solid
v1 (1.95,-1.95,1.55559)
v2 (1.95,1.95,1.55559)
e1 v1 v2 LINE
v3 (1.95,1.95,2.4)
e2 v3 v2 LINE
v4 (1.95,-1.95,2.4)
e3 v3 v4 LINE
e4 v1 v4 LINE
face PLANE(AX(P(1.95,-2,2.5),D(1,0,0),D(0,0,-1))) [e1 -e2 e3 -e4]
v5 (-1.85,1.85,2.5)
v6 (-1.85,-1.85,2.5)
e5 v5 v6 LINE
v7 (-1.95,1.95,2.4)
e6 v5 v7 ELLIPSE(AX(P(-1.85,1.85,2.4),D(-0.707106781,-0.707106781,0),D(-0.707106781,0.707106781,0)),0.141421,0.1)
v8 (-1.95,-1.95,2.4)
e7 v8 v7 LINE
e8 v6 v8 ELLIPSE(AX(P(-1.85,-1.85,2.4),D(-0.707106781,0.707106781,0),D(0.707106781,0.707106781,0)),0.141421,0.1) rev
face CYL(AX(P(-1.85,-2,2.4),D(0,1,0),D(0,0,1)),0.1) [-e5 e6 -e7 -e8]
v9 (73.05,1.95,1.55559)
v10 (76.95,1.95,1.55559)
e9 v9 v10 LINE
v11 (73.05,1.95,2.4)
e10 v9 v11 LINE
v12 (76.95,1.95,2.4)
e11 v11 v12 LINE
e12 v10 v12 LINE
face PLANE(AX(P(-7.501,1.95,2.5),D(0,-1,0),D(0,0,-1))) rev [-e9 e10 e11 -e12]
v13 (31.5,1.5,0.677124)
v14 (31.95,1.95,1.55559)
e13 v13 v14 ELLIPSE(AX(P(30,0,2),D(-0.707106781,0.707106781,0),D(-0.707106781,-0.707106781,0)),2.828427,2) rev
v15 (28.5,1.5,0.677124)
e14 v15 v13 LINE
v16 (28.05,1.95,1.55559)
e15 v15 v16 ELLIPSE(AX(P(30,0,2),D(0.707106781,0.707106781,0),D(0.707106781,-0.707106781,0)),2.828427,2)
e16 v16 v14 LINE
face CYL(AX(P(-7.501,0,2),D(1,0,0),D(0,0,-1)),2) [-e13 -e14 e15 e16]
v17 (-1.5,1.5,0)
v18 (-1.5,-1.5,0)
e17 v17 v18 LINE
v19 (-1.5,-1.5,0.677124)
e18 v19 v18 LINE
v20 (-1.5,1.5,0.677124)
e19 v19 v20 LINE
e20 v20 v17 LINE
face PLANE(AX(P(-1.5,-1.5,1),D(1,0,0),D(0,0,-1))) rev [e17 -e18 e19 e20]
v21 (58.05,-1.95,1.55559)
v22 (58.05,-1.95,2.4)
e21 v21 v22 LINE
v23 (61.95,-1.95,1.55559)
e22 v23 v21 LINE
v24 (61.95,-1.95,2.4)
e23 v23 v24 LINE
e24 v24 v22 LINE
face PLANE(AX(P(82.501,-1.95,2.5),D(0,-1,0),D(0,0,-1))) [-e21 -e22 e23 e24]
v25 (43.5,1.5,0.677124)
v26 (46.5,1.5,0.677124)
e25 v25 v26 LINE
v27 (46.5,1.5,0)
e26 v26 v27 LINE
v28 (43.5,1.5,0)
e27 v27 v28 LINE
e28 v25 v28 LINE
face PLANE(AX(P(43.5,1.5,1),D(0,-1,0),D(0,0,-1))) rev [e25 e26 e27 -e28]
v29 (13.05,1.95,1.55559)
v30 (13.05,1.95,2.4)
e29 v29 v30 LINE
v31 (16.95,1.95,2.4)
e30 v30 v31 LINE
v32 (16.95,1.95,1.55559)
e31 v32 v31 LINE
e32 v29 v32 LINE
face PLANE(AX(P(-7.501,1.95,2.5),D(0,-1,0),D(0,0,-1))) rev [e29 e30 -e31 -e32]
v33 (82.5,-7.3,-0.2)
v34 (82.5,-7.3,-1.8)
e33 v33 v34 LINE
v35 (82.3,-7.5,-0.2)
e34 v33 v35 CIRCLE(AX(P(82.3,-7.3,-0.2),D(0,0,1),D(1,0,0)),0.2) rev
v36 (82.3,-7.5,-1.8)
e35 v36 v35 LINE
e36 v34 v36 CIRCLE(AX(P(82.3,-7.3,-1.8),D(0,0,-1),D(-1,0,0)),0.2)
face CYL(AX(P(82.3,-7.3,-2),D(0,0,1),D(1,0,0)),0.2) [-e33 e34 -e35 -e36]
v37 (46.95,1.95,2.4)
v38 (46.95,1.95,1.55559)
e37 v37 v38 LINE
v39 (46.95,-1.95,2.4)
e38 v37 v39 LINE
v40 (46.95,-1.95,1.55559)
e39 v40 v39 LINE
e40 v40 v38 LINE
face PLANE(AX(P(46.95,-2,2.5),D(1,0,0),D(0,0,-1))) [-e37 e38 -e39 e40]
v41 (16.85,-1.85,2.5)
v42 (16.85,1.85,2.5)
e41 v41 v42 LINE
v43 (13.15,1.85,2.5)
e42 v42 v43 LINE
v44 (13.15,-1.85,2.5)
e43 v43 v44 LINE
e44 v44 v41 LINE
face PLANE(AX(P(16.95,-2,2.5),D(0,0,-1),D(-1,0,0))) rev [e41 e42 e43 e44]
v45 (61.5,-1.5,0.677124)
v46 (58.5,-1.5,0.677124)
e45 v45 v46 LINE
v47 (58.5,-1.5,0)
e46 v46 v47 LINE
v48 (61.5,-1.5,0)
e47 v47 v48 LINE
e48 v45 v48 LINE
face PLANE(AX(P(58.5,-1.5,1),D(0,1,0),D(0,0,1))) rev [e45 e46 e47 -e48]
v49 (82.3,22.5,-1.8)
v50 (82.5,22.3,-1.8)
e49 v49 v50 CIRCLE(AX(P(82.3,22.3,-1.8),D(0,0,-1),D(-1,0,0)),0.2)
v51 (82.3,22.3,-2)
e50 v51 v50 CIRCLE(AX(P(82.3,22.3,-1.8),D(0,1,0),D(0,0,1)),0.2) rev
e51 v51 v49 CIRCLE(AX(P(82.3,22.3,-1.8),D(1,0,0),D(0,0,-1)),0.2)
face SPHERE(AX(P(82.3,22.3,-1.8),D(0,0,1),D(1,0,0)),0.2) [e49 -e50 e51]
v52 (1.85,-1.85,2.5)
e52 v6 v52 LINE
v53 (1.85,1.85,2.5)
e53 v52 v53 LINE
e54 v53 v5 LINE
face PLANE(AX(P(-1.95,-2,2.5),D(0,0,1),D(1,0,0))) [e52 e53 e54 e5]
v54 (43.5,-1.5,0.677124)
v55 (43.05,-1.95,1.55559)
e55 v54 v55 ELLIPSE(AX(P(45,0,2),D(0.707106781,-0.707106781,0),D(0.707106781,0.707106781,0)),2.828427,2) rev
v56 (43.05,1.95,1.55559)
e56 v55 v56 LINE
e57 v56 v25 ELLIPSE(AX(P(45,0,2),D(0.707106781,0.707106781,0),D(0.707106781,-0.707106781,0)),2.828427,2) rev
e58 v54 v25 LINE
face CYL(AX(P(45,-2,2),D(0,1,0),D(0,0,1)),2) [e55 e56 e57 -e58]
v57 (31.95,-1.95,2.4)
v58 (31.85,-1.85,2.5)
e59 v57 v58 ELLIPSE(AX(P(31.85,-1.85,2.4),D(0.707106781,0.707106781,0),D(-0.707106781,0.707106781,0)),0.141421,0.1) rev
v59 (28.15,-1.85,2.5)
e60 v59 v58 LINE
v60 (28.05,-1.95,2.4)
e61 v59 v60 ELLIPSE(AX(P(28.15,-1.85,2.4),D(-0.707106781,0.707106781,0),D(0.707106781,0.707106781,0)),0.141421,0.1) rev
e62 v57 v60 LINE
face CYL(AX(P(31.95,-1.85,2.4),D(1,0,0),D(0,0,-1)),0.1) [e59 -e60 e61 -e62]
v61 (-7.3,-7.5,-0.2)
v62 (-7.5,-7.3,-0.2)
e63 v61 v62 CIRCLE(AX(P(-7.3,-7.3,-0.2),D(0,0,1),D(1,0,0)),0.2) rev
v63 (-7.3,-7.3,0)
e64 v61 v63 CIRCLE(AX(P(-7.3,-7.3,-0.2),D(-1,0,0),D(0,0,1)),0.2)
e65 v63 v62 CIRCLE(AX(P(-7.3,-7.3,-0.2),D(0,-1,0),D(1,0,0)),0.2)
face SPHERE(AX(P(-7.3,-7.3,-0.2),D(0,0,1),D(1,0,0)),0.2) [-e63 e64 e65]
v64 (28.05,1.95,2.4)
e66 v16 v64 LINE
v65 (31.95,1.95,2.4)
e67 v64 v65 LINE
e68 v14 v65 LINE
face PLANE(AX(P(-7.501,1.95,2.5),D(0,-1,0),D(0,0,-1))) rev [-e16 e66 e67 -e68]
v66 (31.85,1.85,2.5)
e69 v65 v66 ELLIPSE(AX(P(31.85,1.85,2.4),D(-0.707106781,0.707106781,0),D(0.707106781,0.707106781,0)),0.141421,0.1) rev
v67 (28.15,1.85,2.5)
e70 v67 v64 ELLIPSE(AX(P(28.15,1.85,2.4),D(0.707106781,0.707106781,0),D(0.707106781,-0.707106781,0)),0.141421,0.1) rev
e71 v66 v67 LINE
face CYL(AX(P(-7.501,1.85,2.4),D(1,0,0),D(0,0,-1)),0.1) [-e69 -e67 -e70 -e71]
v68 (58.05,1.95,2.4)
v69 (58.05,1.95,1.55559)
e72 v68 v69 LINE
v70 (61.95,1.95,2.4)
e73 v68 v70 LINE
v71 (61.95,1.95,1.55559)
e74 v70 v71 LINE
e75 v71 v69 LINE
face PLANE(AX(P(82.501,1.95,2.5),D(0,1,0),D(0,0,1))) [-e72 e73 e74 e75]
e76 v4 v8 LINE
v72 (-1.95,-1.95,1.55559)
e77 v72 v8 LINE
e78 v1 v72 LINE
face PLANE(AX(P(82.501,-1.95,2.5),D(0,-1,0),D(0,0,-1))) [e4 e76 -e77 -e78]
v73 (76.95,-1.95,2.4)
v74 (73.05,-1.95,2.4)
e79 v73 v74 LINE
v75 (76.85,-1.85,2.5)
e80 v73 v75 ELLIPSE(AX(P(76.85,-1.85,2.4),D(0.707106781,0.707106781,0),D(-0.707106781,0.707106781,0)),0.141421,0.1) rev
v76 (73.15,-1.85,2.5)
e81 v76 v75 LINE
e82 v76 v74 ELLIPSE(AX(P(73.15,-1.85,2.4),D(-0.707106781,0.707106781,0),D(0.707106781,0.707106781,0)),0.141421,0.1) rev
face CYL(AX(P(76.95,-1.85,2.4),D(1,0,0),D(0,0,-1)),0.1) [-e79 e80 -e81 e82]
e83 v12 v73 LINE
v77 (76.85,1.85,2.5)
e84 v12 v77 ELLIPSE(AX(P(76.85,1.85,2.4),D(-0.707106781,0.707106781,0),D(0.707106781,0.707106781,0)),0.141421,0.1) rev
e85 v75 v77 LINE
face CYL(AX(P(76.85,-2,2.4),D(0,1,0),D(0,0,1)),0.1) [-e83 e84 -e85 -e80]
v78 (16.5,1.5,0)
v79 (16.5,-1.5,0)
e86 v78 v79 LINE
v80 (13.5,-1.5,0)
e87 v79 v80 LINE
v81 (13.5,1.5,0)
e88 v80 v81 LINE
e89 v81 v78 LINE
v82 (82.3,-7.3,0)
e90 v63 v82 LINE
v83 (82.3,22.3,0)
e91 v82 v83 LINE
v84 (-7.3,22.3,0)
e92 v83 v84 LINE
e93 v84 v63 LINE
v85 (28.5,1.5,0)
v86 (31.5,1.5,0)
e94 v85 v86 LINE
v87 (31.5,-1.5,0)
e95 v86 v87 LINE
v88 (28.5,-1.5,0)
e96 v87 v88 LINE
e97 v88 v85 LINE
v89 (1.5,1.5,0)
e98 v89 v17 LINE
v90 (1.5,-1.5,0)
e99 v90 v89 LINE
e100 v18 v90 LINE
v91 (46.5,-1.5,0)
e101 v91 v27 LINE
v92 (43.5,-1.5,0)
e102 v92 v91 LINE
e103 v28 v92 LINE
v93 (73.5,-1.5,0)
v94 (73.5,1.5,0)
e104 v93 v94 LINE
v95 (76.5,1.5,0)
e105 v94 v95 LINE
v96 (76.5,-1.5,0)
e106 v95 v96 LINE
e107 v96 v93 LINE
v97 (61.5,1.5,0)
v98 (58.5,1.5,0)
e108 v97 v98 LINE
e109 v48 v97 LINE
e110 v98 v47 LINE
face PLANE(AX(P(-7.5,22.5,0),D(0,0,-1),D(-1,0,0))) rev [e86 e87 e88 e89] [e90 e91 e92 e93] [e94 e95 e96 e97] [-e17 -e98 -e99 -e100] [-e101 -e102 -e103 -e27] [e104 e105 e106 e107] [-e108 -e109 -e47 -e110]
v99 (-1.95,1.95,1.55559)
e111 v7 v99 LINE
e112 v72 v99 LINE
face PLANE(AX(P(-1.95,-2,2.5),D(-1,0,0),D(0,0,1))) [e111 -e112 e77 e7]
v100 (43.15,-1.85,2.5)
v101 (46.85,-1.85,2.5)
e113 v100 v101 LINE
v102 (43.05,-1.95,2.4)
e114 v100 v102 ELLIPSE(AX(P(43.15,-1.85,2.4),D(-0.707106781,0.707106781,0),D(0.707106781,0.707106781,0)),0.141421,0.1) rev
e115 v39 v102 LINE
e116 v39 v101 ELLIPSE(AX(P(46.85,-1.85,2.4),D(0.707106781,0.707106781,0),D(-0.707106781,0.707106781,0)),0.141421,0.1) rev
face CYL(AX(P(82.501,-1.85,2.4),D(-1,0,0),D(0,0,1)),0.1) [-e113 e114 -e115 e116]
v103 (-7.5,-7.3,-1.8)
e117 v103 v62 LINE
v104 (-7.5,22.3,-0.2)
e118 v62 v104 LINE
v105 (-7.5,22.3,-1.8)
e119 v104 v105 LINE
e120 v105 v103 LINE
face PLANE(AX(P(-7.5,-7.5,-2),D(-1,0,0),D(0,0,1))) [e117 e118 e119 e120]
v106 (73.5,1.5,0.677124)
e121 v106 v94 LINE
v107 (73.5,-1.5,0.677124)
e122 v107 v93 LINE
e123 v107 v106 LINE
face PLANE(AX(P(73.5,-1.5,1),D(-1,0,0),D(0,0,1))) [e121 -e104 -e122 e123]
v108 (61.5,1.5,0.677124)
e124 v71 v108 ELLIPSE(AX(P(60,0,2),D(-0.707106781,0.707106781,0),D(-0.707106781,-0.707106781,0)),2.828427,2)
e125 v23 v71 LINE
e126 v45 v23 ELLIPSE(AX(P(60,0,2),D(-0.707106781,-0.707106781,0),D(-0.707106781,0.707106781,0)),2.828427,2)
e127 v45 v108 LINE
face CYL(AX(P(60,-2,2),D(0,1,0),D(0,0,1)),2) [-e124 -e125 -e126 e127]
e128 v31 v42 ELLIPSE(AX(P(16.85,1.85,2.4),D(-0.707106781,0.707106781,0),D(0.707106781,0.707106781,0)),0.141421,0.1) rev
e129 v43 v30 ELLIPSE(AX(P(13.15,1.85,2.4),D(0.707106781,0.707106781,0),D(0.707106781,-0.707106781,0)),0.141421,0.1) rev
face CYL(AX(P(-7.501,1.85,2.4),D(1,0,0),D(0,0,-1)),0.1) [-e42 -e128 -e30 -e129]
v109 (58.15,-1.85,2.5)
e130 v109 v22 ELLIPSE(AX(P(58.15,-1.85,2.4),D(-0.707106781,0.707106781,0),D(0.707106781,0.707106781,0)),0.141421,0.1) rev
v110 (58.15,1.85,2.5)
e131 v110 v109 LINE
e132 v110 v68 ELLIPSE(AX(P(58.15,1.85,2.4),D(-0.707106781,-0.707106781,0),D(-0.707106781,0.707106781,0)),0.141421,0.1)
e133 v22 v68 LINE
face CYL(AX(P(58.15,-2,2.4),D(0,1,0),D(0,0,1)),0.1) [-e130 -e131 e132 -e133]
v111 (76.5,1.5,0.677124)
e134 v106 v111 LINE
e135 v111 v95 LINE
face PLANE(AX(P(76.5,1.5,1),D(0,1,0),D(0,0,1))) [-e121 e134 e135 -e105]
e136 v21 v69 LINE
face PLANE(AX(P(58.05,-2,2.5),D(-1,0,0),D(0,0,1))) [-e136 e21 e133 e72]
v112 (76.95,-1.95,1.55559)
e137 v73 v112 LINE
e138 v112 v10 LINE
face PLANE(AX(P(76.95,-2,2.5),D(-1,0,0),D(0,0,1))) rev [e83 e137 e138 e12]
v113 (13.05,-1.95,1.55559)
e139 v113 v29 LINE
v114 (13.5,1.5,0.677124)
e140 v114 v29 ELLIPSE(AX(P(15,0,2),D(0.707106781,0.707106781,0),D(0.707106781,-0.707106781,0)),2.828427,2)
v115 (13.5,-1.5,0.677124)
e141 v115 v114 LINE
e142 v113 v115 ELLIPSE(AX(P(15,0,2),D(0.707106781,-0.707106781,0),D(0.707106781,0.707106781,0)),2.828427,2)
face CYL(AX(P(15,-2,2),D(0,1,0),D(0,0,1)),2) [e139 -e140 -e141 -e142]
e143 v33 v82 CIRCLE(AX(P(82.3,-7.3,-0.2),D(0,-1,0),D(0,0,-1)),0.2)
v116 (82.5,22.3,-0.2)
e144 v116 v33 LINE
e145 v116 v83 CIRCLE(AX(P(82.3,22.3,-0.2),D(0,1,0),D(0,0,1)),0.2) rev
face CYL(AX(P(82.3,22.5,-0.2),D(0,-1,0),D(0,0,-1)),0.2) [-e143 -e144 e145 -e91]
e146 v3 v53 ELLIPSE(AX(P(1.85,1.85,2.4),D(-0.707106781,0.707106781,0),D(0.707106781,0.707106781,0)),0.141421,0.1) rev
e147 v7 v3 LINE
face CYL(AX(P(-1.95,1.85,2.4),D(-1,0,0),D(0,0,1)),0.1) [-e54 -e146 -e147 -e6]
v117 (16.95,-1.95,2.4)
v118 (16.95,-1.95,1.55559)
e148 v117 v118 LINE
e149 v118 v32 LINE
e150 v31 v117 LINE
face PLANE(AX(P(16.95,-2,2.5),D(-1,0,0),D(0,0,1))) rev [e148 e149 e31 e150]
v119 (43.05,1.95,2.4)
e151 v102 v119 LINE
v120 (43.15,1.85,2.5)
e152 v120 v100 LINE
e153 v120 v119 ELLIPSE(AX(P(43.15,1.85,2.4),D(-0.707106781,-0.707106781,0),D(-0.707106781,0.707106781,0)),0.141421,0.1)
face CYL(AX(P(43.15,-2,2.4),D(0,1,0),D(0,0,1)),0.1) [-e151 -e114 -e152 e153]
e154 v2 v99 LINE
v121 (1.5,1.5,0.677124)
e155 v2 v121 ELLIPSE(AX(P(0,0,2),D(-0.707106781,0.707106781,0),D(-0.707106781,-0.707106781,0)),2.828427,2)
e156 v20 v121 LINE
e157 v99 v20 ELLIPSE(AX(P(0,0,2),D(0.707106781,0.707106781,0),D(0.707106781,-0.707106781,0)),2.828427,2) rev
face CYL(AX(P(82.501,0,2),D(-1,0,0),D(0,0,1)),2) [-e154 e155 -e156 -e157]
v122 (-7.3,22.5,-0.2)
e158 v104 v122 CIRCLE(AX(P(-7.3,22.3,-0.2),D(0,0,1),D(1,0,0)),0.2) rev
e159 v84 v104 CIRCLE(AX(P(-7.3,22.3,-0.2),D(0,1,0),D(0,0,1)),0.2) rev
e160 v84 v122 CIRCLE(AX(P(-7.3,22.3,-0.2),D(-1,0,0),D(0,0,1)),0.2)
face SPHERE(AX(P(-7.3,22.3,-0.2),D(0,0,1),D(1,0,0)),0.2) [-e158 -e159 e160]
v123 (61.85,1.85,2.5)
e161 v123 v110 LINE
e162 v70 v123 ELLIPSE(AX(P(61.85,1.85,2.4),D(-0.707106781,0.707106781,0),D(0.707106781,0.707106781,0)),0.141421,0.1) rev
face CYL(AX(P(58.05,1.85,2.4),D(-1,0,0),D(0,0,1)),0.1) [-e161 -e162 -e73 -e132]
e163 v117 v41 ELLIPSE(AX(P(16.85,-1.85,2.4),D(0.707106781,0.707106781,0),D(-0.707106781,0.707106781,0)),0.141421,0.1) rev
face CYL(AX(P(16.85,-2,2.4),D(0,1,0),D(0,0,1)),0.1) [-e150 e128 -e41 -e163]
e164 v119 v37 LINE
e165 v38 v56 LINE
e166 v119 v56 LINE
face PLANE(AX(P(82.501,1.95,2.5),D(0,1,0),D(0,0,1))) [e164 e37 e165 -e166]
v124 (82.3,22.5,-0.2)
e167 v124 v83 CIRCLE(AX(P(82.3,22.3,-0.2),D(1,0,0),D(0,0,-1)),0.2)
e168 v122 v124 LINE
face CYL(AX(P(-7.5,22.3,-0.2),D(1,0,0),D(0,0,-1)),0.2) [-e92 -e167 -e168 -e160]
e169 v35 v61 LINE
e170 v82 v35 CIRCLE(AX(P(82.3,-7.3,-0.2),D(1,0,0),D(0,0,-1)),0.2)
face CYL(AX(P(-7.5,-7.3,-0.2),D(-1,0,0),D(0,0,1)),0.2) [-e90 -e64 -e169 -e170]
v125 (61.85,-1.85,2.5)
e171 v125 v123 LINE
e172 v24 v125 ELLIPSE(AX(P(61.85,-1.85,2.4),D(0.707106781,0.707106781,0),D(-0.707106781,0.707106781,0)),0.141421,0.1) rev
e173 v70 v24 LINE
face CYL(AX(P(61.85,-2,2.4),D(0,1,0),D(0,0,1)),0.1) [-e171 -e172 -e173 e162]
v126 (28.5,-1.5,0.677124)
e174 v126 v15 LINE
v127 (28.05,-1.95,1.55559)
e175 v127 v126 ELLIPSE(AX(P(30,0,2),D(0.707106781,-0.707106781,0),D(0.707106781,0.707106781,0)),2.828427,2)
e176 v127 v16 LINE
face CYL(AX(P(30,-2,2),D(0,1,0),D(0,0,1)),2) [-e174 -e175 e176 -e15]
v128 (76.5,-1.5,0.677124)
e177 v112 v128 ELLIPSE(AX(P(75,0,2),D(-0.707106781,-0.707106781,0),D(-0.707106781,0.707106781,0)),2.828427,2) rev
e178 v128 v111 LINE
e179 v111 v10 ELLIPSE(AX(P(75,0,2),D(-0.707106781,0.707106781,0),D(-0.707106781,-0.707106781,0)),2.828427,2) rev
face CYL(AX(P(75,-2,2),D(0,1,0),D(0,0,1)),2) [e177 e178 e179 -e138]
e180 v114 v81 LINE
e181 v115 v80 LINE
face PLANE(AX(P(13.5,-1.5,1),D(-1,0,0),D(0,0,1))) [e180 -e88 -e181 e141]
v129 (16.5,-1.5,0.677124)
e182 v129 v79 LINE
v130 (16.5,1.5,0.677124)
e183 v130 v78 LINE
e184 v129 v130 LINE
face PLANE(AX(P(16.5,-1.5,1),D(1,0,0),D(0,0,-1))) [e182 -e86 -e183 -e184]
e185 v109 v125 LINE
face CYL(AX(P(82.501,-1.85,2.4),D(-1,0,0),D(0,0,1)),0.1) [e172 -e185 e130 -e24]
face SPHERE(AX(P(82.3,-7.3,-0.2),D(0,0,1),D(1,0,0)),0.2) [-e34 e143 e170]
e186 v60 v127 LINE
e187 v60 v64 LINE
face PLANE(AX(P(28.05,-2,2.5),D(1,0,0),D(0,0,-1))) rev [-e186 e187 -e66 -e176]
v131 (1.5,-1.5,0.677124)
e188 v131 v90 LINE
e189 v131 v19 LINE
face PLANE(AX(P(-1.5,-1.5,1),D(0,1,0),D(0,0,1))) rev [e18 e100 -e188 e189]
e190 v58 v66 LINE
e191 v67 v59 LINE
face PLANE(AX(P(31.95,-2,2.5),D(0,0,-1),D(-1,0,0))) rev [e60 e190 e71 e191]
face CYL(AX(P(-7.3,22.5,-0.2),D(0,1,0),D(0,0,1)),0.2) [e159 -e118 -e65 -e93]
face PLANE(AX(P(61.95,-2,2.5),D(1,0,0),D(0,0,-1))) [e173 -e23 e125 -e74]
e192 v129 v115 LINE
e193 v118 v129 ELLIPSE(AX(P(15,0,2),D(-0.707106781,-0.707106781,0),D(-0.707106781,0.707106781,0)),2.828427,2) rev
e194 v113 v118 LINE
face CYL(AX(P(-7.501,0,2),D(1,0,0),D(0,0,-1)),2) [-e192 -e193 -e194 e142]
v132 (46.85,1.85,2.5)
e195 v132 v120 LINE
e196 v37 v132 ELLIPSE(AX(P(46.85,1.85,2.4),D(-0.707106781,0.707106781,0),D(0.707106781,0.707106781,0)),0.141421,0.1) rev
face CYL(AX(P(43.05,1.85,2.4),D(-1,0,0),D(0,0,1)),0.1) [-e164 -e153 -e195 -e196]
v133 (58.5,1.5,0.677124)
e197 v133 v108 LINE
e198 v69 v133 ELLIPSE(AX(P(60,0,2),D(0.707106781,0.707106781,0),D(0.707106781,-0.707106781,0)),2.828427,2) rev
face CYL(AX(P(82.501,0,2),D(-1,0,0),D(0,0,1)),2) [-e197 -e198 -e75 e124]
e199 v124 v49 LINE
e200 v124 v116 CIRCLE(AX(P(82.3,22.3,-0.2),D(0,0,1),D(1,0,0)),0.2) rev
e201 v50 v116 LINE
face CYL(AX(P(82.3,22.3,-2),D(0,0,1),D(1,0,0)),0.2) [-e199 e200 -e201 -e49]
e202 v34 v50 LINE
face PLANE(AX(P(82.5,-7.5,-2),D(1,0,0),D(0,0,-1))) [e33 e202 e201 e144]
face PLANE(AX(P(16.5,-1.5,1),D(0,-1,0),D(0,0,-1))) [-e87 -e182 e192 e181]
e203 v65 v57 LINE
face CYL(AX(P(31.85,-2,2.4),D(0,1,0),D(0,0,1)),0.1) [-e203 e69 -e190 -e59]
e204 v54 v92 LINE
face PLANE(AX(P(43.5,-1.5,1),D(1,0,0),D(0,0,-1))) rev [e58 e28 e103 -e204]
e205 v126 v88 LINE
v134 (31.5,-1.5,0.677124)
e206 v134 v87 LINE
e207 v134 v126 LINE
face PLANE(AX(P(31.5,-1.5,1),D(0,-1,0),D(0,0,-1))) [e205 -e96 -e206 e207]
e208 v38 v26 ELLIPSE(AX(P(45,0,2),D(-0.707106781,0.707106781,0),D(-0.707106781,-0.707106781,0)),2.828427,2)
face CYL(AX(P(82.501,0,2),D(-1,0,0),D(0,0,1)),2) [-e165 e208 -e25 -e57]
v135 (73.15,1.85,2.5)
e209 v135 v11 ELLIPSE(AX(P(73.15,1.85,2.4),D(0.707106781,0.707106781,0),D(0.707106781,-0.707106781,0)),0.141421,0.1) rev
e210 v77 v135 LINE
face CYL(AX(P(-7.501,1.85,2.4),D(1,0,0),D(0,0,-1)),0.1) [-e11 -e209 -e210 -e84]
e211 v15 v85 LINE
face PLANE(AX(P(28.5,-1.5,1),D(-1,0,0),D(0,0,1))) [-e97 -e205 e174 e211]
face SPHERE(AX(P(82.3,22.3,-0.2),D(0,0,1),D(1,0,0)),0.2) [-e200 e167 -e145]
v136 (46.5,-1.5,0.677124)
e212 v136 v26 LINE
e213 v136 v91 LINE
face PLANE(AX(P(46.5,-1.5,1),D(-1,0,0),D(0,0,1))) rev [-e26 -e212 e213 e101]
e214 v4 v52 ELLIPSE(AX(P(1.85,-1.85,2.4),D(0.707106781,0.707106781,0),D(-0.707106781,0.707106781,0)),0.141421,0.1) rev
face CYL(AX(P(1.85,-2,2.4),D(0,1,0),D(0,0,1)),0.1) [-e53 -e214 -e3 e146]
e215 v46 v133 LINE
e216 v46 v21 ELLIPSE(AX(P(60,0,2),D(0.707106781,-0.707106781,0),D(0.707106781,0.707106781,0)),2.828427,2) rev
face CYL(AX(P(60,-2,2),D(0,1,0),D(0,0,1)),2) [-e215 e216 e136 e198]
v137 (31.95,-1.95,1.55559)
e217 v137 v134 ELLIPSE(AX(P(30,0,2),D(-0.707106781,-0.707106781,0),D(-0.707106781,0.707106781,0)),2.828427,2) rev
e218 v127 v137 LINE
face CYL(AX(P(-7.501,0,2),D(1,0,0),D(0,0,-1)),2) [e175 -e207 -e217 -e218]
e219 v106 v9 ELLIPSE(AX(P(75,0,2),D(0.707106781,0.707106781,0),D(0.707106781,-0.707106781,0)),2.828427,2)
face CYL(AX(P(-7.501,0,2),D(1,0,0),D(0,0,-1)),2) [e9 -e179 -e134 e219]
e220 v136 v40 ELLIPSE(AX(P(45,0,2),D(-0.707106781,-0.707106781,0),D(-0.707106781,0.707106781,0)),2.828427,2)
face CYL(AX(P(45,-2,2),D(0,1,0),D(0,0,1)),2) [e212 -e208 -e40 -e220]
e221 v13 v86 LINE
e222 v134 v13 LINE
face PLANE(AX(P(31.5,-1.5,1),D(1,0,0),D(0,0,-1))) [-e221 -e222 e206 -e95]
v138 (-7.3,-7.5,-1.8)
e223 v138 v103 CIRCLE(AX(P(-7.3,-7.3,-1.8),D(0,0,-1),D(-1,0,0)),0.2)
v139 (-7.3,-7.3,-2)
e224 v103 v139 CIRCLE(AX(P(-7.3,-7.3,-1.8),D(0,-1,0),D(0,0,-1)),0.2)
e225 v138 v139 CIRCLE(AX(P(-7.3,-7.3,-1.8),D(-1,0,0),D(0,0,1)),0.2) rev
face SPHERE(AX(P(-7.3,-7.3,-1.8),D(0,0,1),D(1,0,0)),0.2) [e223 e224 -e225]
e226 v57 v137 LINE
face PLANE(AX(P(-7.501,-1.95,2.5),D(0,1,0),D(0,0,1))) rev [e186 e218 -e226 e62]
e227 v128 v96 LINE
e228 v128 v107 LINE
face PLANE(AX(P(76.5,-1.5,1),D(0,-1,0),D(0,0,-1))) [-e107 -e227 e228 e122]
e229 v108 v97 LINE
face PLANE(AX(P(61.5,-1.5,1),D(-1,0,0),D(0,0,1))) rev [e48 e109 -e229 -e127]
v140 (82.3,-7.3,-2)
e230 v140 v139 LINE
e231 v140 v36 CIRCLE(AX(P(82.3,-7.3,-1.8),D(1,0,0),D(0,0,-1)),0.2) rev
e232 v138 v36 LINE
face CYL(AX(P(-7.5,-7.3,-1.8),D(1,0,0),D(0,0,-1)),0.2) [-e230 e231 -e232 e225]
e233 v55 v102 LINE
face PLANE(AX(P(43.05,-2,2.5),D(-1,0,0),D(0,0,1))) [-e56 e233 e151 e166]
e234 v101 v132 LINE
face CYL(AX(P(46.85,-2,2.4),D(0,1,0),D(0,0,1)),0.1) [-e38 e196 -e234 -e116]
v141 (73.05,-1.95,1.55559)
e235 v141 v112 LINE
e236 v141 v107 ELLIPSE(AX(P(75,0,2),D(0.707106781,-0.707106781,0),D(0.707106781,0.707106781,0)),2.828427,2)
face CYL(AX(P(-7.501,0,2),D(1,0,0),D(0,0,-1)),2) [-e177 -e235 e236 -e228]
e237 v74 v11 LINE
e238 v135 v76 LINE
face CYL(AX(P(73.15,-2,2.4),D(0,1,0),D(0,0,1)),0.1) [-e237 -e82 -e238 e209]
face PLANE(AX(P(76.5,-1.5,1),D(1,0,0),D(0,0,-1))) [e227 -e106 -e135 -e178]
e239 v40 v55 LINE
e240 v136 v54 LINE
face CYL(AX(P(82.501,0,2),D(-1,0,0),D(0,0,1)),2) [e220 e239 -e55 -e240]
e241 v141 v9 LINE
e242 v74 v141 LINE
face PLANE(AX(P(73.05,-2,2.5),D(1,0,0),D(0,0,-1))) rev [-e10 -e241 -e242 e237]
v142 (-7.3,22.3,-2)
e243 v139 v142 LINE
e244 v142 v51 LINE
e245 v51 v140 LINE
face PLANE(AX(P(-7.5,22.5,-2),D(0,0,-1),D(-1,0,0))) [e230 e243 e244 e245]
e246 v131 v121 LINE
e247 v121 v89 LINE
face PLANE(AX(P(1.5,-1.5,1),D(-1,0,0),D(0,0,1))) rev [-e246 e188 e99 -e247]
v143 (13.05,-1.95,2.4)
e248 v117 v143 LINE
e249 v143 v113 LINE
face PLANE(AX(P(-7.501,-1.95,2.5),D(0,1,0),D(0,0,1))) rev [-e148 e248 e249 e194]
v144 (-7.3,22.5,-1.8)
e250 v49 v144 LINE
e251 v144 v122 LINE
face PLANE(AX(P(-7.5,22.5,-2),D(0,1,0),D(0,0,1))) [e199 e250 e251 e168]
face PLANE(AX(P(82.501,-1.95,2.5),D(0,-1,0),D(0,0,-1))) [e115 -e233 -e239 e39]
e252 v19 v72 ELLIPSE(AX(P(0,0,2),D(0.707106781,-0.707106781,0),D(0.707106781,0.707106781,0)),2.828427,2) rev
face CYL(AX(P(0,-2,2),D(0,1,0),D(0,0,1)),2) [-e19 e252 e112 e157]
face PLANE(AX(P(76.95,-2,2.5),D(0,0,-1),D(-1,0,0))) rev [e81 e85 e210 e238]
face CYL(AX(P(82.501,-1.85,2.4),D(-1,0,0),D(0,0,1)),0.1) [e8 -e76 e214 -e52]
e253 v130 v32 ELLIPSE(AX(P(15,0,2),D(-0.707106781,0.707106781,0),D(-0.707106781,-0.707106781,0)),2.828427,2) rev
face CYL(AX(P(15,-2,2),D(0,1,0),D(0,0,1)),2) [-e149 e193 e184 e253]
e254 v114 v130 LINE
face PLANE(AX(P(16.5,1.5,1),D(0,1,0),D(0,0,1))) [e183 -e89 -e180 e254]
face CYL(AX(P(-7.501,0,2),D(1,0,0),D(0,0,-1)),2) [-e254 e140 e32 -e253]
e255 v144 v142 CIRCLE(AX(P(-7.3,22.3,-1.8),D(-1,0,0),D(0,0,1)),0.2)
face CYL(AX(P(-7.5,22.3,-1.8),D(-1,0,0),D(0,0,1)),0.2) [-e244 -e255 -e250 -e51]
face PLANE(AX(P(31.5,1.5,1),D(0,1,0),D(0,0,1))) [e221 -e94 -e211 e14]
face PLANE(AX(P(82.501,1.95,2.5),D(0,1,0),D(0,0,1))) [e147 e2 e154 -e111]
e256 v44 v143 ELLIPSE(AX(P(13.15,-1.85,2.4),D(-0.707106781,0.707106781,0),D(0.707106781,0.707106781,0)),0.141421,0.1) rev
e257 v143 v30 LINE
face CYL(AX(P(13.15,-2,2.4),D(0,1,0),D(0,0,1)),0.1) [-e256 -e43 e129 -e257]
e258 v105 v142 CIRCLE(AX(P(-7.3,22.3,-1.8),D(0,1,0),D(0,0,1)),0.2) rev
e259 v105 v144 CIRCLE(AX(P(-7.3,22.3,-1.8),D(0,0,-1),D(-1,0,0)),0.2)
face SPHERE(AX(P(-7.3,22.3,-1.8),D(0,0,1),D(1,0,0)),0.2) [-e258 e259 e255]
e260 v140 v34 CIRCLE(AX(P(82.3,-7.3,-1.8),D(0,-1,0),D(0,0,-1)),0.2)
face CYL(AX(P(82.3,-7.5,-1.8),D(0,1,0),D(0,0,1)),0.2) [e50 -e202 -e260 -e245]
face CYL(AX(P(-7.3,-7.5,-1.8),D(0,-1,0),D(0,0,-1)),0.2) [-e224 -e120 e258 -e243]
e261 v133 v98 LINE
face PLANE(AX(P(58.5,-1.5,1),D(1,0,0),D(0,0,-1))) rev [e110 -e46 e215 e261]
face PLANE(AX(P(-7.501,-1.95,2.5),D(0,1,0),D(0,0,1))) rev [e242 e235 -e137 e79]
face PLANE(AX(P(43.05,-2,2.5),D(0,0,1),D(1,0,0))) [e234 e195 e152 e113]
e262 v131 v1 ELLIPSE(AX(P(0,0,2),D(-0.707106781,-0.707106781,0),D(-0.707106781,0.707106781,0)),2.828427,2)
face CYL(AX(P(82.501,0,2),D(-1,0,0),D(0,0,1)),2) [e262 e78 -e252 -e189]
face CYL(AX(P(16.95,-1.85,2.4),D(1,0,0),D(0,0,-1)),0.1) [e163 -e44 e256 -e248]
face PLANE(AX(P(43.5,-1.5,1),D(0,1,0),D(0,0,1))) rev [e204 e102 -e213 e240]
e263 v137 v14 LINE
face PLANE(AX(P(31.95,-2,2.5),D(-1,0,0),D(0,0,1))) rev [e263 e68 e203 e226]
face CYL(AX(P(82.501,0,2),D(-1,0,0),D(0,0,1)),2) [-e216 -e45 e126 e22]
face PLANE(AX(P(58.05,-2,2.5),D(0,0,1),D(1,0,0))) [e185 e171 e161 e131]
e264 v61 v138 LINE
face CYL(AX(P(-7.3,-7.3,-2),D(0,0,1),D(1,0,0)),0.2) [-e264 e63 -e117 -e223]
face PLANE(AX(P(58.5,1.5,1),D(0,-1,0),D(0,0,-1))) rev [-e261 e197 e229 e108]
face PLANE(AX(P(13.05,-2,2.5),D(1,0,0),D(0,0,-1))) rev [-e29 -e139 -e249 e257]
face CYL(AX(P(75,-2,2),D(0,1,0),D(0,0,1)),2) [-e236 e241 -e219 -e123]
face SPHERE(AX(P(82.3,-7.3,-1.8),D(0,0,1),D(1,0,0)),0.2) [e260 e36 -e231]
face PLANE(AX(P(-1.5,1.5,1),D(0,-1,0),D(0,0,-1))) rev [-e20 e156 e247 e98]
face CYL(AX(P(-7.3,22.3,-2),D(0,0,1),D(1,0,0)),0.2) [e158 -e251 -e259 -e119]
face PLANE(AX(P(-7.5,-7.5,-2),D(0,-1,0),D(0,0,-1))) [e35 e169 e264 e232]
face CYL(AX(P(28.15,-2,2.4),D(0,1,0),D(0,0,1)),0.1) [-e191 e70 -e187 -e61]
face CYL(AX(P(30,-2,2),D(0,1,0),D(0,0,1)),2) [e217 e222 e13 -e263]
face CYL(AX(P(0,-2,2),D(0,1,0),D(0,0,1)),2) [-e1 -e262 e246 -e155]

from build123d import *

# Parameters (mm, degrees)
SKETCH_1_W                      = 90
SKETCH_1_H                      = 30
EXTRUDE_1_DEPTH                 = 2
SKETCH_2_W                      = 3
SKETCH_2_H                      = 3
EXTRUDE_2_DEPTH                 = 1
EXTRUDE_3_DEPTH                 = 2
CUT_EXTRUDE_1_REACH             = 87.55
CUT_EXTRUDE_1_DIRECTION_2_REACH = 87.55
FILLET_1_R                      = 0.1
FILLET_1_OF_MIRROR_1_R          = 0.1
FILLET_1_OF_MIRROR_3_R          = 0.1
FILLET_2_R                      = 0.2


# Read off the part's stored shape, not the designer's step: 镜向4
with BuildPart() as part:
    # 草图1 → 凸台-拉伸1 (new body)
    with BuildSketch(Plane.XY):
        with Locations((37.5, 7.5)):
            Rectangle(SKETCH_1_W, SKETCH_1_H)
    extrude(amount=-EXTRUDE_1_DEPTH)

    # 草图2 → 凸台-拉伸2 (add)
    with BuildSketch(Plane.XY):
        Rectangle(SKETCH_2_W, SKETCH_2_H)
    extrude_2 = extrude(amount=EXTRUDE_2_DEPTH)

    # 草图3 → 凸台-拉伸3 (add, symmetric)
    with BuildSketch(Plane(origin=(0, 0, 0), x_dir=(1, 0, 0), z_dir=(0, 1, 0))):
        with BuildLine():
            Line((-1.95, -2.5), (1.95, -2.5))
            Line((1.95, -2.5), (1.95, -1.555590279))
            ThreePointArc((1.95, -1.555590279), (1.780042303, -1.088161527), (1.5, -0.677124344))
            Line((1.5, -0.677124344), (-1.5, -0.677124344))
            ThreePointArc((-1.5, -0.677124344), (-1.780042303, -1.088161527), (-1.95, -1.555590279))
            Line((-1.95, -1.555590279), (-1.95, -2.5))
        make_face()
    extrude_3 = extrude(amount=EXTRUDE_3_DEPTH, both=True)

    # 草图4 → 切除-拉伸1 (cut, up to next)
    with BuildSketch(Plane(origin=(0, 0, 0), x_dir=(0, 0, -1), z_dir=(1, 0, 0)), mode=Mode.PRIVATE) as cut_extrude_1_sk1:
        with BuildLine():
            Line((-2.5, 1.95), (-1.555590279, 1.95))
            ThreePointArc((-1.555590279, 1.95), (-1.088161527, 1.780042303), (-0.677124344, 1.5))
            Line((-0.677124344, 1.5), (-0.677124344, 2))
            Line((-0.677124344, 2), (-2.5, 2))
            Line((-2.5, 2), (-2.5, 1.95))
        make_face()
    cut_extrude_1_tool1 = extrude(cut_extrude_1_sk1.sketch, amount=-CUT_EXTRUDE_1_REACH, mode=Mode.PRIVATE) & part.part
    # 草图4 → 切除-拉伸1 (cut, up to next)
    with BuildSketch(Plane(origin=(0, 0, 0), x_dir=(0, 0, -1), z_dir=(1, 0, 0)), mode=Mode.PRIVATE) as cut_extrude_1_sk2:
        with BuildLine():
            Line((-2.5, -2), (-0.677124344, -2))
            Line((-0.677124344, -2), (-0.677124344, -1.5))
            ThreePointArc((-0.677124344, -1.5), (-1.088161527, -1.780042303), (-1.555590279, -1.95))
            Line((-1.555590279, -1.95), (-2.5, -1.95))
            Line((-2.5, -1.95), (-2.5, -2))
        make_face()
    cut_extrude_1_tool2 = extrude(cut_extrude_1_sk2.sketch, amount=-CUT_EXTRUDE_1_REACH, mode=Mode.PRIVATE) & part.part
    cut_extrude_1_1 = cut_extrude_1_tool1.solids().sort_by_distance((0, 1.873038, 1.175075))[0]
    add(cut_extrude_1_1, mode=Mode.SUBTRACT)
    cut_extrude_1_2 = cut_extrude_1_tool2.solids().sort_by_distance((0, -1.873038, 1.175075))[0]
    add(cut_extrude_1_2, mode=Mode.SUBTRACT)
    cut_extrude_1 = cut_extrude_1_1 + cut_extrude_1_2  # 切除-拉伸1 as one shape, for the pattern or mirror that repeats it

    # 草图4 → 切除-拉伸1 direction 2 (cut, up to next)
    with BuildSketch(Plane(origin=(0, 0, 0), x_dir=(0, 0, -1), z_dir=(1, 0, 0)), mode=Mode.PRIVATE) as cut_extrude_1_direction_2_sk1:
        with BuildLine():
            Line((-2.5, 1.95), (-1.555590279, 1.95))
            ThreePointArc((-1.555590279, 1.95), (-1.088161527, 1.780042303), (-0.677124344, 1.5))
            Line((-0.677124344, 1.5), (-0.677124344, 2))
            Line((-0.677124344, 2), (-2.5, 2))
            Line((-2.5, 2), (-2.5, 1.95))
        make_face()
    cut_extrude_1_direction_2_tool1 = extrude(cut_extrude_1_direction_2_sk1.sketch, amount=CUT_EXTRUDE_1_DIRECTION_2_REACH, mode=Mode.PRIVATE) & part.part
    # 草图4 → 切除-拉伸1 direction 2 (cut, up to next)
    with BuildSketch(Plane(origin=(0, 0, 0), x_dir=(0, 0, -1), z_dir=(1, 0, 0)), mode=Mode.PRIVATE) as cut_extrude_1_direction_2_sk2:
        with BuildLine():
            Line((-2.5, -2), (-0.677124344, -2))
            Line((-0.677124344, -2), (-0.677124344, -1.5))
            ThreePointArc((-0.677124344, -1.5), (-1.088161527, -1.780042303), (-1.555590279, -1.95))
            Line((-1.555590279, -1.95), (-2.5, -1.95))
            Line((-2.5, -1.95), (-2.5, -2))
        make_face()
    cut_extrude_1_direction_2_tool2 = extrude(cut_extrude_1_direction_2_sk2.sketch, amount=CUT_EXTRUDE_1_DIRECTION_2_REACH, mode=Mode.PRIVATE) & part.part
    cut_extrude_1_direction_2_1 = cut_extrude_1_direction_2_tool1.solids().sort_by_distance((0, 1.873038, 1.175075))[0]
    add(cut_extrude_1_direction_2_1, mode=Mode.SUBTRACT)
    cut_extrude_1_direction_2_2 = cut_extrude_1_direction_2_tool2.solids().sort_by_distance((0, -1.873038, 1.175075))[0]
    add(cut_extrude_1_direction_2_2, mode=Mode.SUBTRACT)
    cut_extrude_1_direction_2 = cut_extrude_1_direction_2_1 + cut_extrude_1_direction_2_2  # 切除-拉伸1 direction 2 as one shape, for the pattern or mirror that repeats it

    # 圆角1
    fillet_1_edges = [part.edges().sort_by_distance(p)[0] for p in [
        (-1.95, 0, 2.5),
        (1.95, 0, 2.5),
        (0, -1.95, 2.5),
        (0, 1.95, 2.5),
    ]]
    fillet(fillet_1_edges, radius=FILLET_1_R)

    # 镜向1: 凸台-拉伸2, 凸台-拉伸3, 切除-拉伸1, 切除-拉伸1 direction 2 across plane
    add(extrude_2.mirror(Plane(origin=(7.5, 0, 0), x_dir=(0, 0, 1), z_dir=(1, 0, 0))))
    add(extrude_3.mirror(Plane(origin=(7.5, 0, 0), x_dir=(0, 0, 1), z_dir=(1, 0, 0))))
    add(cut_extrude_1.mirror(Plane(origin=(7.5, 0, 0), x_dir=(0, 0, 1), z_dir=(1, 0, 0))), mode=Mode.SUBTRACT)
    add(cut_extrude_1_direction_2.mirror(Plane(origin=(7.5, 0, 0), x_dir=(0, 0, 1), z_dir=(1, 0, 0))), mode=Mode.SUBTRACT)

    # 圆角1 of 镜向1
    fillet_1_of_mirror_1_edges = [part.edges().sort_by_distance(p)[0] for p in [
        (16.95, 0, 2.5),
        (13.05, 0, 2.5),
        (15, -1.95, 2.5),
        (15, 1.95, 2.5),
    ]]
    fillet(fillet_1_of_mirror_1_edges, radius=FILLET_1_OF_MIRROR_1_R)

    # 镜向3: 凸台-拉伸2, 凸台-拉伸3, 切除-拉伸1, 切除-拉伸1 direction 2 across plane
    add(extrude_2.mirror(Plane(origin=(15, 0, 0), x_dir=(0, 0, 1), z_dir=(1, 0, 0))))
    add(extrude_3.mirror(Plane(origin=(15, 0, 0), x_dir=(0, 0, 1), z_dir=(1, 0, 0))))
    add(cut_extrude_1.mirror(Plane(origin=(15, 0, 0), x_dir=(0, 0, 1), z_dir=(1, 0, 0))), mode=Mode.SUBTRACT)
    add(cut_extrude_1_direction_2.mirror(Plane(origin=(15, 0, 0), x_dir=(0, 0, 1), z_dir=(1, 0, 0))), mode=Mode.SUBTRACT)

    # 圆角1 of 镜向3
    fillet_1_of_mirror_3_edges = [part.edges().sort_by_distance(p)[0] for p in [
        (31.95, 0, 2.5),
        (28.05, 0, 2.5),
        (30, -1.95, 2.5),
        (30, 1.95, 2.5),
    ]]
    fillet(fillet_1_of_mirror_3_edges, radius=FILLET_1_OF_MIRROR_3_R)

    # 镜向4: part across plane


with BuildPart() as part_1:
    add(part.part)
    add(part.part.mirror(Plane(origin=(37.5, 0, 0), x_dir=(0, 0, 1), z_dir=(1, 0, 0))))

    # 圆角2
    fillet_2_edges = [part_1.edges().sort_by_distance(p)[0] for p in [
        (82.5, 7.5, -2),
        (37.5, 22.5, -2),
        (-7.5, 7.5, -2),
        (37.5, 22.5, 0),
        (82.5, 7.5, 0),
        (37.5, -7.5, 0),
        (-7.5, 7.5, 0),
        (37.5, -7.5, -2),
        (-7.5, 22.5, -1),
        (82.5, 22.5, -1),
        (82.5, -7.5, -1),
        (-7.5, -7.5, -1),
    ]]
    fillet(fillet_2_edges, radius=FILLET_2_R)


solid = part_1.part
